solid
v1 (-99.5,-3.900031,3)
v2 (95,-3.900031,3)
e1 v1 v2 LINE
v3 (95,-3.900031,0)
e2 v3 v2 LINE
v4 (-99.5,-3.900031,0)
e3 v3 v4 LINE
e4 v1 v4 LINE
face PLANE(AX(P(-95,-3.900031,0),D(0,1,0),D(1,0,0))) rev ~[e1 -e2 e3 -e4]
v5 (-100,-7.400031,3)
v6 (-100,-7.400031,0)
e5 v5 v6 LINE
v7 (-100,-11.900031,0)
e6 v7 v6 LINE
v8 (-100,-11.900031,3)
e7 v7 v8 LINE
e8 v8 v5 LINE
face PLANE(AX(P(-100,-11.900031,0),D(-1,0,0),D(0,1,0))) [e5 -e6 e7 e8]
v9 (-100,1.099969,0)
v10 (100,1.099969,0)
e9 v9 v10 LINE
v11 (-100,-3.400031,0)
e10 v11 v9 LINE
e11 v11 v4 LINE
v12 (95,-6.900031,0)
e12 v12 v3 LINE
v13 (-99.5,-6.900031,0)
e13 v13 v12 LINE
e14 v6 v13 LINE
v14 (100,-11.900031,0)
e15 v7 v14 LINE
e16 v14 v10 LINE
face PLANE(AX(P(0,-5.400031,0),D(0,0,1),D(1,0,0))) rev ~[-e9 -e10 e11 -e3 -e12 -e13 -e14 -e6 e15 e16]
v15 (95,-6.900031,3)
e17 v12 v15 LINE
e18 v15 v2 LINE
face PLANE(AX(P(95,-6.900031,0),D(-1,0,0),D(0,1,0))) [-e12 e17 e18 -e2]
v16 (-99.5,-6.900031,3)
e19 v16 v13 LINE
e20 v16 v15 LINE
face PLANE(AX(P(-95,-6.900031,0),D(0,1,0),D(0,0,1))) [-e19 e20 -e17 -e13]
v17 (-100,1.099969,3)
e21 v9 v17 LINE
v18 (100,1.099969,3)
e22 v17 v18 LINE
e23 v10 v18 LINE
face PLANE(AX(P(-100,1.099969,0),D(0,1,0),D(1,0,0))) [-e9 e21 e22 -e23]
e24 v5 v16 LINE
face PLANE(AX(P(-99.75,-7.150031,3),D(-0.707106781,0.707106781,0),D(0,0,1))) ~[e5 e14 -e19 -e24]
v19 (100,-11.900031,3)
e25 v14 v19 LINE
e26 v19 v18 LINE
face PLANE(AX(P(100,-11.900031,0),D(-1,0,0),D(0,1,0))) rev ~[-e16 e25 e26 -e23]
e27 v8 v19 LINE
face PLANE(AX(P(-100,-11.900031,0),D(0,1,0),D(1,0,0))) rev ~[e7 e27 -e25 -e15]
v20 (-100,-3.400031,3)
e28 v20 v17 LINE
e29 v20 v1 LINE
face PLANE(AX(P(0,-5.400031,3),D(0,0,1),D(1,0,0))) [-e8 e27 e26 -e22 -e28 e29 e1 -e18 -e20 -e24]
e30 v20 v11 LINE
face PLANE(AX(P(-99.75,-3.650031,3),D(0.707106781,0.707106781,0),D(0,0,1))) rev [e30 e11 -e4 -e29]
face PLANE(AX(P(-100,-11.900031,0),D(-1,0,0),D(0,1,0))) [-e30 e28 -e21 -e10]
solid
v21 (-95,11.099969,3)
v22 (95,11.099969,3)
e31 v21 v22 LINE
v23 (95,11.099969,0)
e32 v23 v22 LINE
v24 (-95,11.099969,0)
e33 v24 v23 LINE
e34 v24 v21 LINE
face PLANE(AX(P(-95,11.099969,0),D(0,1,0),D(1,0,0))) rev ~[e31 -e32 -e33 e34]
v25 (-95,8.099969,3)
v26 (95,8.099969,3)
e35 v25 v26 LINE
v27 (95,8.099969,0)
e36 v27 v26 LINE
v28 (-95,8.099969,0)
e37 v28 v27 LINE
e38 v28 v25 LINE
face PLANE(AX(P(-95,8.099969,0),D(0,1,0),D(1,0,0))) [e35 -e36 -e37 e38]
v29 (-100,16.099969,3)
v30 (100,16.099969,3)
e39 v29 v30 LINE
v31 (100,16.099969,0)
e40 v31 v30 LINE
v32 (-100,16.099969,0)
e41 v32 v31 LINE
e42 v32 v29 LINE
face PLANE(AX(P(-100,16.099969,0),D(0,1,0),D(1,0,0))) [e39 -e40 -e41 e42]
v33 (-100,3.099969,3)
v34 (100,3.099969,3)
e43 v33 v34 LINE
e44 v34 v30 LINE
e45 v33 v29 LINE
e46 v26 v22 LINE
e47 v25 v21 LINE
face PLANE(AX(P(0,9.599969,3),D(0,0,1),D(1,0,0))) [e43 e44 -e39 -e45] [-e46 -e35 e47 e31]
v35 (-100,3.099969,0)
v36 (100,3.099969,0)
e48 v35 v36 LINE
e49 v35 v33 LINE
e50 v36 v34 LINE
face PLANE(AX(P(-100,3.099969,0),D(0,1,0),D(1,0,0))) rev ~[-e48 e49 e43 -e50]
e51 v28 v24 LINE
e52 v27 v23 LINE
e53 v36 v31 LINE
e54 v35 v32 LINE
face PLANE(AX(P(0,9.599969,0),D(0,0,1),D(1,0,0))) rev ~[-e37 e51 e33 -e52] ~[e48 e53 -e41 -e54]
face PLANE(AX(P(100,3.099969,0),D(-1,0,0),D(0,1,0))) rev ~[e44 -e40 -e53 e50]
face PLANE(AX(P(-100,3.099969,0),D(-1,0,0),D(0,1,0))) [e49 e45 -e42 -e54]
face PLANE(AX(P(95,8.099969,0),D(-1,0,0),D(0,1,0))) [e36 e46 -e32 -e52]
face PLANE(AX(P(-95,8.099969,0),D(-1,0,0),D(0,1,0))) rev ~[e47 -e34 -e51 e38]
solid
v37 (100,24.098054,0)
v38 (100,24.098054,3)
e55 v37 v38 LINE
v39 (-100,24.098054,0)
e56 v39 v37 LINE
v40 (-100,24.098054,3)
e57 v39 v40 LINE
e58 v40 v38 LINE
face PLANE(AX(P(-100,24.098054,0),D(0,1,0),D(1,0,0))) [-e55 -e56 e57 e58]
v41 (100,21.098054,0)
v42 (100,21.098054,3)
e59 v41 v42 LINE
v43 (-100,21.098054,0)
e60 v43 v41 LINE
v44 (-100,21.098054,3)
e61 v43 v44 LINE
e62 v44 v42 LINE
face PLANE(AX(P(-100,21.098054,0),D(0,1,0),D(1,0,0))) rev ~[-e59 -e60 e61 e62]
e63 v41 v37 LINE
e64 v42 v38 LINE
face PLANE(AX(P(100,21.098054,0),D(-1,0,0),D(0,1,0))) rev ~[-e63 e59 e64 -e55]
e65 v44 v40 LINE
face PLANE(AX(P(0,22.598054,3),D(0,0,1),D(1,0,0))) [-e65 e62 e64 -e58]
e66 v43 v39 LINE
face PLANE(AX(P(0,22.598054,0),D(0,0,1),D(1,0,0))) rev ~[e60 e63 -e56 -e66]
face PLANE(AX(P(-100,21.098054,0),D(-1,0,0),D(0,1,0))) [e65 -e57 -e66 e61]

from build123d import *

# Parameters (mm, degrees)
F0_W     = 200
F0_H     = 3
F1_DEPTH = 3
F0_H_2   = 13
F0_W_2   = 190
F3_DEPTH = 25
F4_SIZE  = 0.5


with BuildPart() as f1:
    # F0 (on Top) → F1 (new body)
    with BuildSketch(Plane.XY):
        with Locations((0, 22.59805426)):
            Rectangle(F0_W, F0_H)
    extrude(amount=F1_DEPTH)


with BuildPart() as f1b:
    # F0 (on Top) → F1, piece 2 (new body)
    with BuildSketch(Plane.XY):
        with Locations((0, 9.599968791)):
            Rectangle(F0_W, F0_H_2)
        with Locations((0, 9.599968791)):
            Rectangle(F0_W_2, F0_H, mode=Mode.SUBTRACT)
    extrude(amount=F1_DEPTH)


with BuildPart() as f2_1:
    # F2: copy of F1b
    add(f1b.part.moved(Location((0, -15, 0))))

    # F3 (cut): a face of the model
    f3_faces = [f2_1.faces().sort_by_distance(p)[0] for p in [
        (-95, -5.400031209, 1.5),
    ]]
    extrude(f3_faces, amount=-F3_DEPTH, mode=Mode.SUBTRACT)

    # F4
    f4_edges = [f2_1.edges().sort_by_distance(p)[0] for p in [
        (-100, -3.900031, 1.5),
        (-100, -6.900031, 1.5),
    ]]
    chamfer(f4_edges, length=F4_SIZE)


solid = Compound([f1.part, f1b.part, f2_1.part])
